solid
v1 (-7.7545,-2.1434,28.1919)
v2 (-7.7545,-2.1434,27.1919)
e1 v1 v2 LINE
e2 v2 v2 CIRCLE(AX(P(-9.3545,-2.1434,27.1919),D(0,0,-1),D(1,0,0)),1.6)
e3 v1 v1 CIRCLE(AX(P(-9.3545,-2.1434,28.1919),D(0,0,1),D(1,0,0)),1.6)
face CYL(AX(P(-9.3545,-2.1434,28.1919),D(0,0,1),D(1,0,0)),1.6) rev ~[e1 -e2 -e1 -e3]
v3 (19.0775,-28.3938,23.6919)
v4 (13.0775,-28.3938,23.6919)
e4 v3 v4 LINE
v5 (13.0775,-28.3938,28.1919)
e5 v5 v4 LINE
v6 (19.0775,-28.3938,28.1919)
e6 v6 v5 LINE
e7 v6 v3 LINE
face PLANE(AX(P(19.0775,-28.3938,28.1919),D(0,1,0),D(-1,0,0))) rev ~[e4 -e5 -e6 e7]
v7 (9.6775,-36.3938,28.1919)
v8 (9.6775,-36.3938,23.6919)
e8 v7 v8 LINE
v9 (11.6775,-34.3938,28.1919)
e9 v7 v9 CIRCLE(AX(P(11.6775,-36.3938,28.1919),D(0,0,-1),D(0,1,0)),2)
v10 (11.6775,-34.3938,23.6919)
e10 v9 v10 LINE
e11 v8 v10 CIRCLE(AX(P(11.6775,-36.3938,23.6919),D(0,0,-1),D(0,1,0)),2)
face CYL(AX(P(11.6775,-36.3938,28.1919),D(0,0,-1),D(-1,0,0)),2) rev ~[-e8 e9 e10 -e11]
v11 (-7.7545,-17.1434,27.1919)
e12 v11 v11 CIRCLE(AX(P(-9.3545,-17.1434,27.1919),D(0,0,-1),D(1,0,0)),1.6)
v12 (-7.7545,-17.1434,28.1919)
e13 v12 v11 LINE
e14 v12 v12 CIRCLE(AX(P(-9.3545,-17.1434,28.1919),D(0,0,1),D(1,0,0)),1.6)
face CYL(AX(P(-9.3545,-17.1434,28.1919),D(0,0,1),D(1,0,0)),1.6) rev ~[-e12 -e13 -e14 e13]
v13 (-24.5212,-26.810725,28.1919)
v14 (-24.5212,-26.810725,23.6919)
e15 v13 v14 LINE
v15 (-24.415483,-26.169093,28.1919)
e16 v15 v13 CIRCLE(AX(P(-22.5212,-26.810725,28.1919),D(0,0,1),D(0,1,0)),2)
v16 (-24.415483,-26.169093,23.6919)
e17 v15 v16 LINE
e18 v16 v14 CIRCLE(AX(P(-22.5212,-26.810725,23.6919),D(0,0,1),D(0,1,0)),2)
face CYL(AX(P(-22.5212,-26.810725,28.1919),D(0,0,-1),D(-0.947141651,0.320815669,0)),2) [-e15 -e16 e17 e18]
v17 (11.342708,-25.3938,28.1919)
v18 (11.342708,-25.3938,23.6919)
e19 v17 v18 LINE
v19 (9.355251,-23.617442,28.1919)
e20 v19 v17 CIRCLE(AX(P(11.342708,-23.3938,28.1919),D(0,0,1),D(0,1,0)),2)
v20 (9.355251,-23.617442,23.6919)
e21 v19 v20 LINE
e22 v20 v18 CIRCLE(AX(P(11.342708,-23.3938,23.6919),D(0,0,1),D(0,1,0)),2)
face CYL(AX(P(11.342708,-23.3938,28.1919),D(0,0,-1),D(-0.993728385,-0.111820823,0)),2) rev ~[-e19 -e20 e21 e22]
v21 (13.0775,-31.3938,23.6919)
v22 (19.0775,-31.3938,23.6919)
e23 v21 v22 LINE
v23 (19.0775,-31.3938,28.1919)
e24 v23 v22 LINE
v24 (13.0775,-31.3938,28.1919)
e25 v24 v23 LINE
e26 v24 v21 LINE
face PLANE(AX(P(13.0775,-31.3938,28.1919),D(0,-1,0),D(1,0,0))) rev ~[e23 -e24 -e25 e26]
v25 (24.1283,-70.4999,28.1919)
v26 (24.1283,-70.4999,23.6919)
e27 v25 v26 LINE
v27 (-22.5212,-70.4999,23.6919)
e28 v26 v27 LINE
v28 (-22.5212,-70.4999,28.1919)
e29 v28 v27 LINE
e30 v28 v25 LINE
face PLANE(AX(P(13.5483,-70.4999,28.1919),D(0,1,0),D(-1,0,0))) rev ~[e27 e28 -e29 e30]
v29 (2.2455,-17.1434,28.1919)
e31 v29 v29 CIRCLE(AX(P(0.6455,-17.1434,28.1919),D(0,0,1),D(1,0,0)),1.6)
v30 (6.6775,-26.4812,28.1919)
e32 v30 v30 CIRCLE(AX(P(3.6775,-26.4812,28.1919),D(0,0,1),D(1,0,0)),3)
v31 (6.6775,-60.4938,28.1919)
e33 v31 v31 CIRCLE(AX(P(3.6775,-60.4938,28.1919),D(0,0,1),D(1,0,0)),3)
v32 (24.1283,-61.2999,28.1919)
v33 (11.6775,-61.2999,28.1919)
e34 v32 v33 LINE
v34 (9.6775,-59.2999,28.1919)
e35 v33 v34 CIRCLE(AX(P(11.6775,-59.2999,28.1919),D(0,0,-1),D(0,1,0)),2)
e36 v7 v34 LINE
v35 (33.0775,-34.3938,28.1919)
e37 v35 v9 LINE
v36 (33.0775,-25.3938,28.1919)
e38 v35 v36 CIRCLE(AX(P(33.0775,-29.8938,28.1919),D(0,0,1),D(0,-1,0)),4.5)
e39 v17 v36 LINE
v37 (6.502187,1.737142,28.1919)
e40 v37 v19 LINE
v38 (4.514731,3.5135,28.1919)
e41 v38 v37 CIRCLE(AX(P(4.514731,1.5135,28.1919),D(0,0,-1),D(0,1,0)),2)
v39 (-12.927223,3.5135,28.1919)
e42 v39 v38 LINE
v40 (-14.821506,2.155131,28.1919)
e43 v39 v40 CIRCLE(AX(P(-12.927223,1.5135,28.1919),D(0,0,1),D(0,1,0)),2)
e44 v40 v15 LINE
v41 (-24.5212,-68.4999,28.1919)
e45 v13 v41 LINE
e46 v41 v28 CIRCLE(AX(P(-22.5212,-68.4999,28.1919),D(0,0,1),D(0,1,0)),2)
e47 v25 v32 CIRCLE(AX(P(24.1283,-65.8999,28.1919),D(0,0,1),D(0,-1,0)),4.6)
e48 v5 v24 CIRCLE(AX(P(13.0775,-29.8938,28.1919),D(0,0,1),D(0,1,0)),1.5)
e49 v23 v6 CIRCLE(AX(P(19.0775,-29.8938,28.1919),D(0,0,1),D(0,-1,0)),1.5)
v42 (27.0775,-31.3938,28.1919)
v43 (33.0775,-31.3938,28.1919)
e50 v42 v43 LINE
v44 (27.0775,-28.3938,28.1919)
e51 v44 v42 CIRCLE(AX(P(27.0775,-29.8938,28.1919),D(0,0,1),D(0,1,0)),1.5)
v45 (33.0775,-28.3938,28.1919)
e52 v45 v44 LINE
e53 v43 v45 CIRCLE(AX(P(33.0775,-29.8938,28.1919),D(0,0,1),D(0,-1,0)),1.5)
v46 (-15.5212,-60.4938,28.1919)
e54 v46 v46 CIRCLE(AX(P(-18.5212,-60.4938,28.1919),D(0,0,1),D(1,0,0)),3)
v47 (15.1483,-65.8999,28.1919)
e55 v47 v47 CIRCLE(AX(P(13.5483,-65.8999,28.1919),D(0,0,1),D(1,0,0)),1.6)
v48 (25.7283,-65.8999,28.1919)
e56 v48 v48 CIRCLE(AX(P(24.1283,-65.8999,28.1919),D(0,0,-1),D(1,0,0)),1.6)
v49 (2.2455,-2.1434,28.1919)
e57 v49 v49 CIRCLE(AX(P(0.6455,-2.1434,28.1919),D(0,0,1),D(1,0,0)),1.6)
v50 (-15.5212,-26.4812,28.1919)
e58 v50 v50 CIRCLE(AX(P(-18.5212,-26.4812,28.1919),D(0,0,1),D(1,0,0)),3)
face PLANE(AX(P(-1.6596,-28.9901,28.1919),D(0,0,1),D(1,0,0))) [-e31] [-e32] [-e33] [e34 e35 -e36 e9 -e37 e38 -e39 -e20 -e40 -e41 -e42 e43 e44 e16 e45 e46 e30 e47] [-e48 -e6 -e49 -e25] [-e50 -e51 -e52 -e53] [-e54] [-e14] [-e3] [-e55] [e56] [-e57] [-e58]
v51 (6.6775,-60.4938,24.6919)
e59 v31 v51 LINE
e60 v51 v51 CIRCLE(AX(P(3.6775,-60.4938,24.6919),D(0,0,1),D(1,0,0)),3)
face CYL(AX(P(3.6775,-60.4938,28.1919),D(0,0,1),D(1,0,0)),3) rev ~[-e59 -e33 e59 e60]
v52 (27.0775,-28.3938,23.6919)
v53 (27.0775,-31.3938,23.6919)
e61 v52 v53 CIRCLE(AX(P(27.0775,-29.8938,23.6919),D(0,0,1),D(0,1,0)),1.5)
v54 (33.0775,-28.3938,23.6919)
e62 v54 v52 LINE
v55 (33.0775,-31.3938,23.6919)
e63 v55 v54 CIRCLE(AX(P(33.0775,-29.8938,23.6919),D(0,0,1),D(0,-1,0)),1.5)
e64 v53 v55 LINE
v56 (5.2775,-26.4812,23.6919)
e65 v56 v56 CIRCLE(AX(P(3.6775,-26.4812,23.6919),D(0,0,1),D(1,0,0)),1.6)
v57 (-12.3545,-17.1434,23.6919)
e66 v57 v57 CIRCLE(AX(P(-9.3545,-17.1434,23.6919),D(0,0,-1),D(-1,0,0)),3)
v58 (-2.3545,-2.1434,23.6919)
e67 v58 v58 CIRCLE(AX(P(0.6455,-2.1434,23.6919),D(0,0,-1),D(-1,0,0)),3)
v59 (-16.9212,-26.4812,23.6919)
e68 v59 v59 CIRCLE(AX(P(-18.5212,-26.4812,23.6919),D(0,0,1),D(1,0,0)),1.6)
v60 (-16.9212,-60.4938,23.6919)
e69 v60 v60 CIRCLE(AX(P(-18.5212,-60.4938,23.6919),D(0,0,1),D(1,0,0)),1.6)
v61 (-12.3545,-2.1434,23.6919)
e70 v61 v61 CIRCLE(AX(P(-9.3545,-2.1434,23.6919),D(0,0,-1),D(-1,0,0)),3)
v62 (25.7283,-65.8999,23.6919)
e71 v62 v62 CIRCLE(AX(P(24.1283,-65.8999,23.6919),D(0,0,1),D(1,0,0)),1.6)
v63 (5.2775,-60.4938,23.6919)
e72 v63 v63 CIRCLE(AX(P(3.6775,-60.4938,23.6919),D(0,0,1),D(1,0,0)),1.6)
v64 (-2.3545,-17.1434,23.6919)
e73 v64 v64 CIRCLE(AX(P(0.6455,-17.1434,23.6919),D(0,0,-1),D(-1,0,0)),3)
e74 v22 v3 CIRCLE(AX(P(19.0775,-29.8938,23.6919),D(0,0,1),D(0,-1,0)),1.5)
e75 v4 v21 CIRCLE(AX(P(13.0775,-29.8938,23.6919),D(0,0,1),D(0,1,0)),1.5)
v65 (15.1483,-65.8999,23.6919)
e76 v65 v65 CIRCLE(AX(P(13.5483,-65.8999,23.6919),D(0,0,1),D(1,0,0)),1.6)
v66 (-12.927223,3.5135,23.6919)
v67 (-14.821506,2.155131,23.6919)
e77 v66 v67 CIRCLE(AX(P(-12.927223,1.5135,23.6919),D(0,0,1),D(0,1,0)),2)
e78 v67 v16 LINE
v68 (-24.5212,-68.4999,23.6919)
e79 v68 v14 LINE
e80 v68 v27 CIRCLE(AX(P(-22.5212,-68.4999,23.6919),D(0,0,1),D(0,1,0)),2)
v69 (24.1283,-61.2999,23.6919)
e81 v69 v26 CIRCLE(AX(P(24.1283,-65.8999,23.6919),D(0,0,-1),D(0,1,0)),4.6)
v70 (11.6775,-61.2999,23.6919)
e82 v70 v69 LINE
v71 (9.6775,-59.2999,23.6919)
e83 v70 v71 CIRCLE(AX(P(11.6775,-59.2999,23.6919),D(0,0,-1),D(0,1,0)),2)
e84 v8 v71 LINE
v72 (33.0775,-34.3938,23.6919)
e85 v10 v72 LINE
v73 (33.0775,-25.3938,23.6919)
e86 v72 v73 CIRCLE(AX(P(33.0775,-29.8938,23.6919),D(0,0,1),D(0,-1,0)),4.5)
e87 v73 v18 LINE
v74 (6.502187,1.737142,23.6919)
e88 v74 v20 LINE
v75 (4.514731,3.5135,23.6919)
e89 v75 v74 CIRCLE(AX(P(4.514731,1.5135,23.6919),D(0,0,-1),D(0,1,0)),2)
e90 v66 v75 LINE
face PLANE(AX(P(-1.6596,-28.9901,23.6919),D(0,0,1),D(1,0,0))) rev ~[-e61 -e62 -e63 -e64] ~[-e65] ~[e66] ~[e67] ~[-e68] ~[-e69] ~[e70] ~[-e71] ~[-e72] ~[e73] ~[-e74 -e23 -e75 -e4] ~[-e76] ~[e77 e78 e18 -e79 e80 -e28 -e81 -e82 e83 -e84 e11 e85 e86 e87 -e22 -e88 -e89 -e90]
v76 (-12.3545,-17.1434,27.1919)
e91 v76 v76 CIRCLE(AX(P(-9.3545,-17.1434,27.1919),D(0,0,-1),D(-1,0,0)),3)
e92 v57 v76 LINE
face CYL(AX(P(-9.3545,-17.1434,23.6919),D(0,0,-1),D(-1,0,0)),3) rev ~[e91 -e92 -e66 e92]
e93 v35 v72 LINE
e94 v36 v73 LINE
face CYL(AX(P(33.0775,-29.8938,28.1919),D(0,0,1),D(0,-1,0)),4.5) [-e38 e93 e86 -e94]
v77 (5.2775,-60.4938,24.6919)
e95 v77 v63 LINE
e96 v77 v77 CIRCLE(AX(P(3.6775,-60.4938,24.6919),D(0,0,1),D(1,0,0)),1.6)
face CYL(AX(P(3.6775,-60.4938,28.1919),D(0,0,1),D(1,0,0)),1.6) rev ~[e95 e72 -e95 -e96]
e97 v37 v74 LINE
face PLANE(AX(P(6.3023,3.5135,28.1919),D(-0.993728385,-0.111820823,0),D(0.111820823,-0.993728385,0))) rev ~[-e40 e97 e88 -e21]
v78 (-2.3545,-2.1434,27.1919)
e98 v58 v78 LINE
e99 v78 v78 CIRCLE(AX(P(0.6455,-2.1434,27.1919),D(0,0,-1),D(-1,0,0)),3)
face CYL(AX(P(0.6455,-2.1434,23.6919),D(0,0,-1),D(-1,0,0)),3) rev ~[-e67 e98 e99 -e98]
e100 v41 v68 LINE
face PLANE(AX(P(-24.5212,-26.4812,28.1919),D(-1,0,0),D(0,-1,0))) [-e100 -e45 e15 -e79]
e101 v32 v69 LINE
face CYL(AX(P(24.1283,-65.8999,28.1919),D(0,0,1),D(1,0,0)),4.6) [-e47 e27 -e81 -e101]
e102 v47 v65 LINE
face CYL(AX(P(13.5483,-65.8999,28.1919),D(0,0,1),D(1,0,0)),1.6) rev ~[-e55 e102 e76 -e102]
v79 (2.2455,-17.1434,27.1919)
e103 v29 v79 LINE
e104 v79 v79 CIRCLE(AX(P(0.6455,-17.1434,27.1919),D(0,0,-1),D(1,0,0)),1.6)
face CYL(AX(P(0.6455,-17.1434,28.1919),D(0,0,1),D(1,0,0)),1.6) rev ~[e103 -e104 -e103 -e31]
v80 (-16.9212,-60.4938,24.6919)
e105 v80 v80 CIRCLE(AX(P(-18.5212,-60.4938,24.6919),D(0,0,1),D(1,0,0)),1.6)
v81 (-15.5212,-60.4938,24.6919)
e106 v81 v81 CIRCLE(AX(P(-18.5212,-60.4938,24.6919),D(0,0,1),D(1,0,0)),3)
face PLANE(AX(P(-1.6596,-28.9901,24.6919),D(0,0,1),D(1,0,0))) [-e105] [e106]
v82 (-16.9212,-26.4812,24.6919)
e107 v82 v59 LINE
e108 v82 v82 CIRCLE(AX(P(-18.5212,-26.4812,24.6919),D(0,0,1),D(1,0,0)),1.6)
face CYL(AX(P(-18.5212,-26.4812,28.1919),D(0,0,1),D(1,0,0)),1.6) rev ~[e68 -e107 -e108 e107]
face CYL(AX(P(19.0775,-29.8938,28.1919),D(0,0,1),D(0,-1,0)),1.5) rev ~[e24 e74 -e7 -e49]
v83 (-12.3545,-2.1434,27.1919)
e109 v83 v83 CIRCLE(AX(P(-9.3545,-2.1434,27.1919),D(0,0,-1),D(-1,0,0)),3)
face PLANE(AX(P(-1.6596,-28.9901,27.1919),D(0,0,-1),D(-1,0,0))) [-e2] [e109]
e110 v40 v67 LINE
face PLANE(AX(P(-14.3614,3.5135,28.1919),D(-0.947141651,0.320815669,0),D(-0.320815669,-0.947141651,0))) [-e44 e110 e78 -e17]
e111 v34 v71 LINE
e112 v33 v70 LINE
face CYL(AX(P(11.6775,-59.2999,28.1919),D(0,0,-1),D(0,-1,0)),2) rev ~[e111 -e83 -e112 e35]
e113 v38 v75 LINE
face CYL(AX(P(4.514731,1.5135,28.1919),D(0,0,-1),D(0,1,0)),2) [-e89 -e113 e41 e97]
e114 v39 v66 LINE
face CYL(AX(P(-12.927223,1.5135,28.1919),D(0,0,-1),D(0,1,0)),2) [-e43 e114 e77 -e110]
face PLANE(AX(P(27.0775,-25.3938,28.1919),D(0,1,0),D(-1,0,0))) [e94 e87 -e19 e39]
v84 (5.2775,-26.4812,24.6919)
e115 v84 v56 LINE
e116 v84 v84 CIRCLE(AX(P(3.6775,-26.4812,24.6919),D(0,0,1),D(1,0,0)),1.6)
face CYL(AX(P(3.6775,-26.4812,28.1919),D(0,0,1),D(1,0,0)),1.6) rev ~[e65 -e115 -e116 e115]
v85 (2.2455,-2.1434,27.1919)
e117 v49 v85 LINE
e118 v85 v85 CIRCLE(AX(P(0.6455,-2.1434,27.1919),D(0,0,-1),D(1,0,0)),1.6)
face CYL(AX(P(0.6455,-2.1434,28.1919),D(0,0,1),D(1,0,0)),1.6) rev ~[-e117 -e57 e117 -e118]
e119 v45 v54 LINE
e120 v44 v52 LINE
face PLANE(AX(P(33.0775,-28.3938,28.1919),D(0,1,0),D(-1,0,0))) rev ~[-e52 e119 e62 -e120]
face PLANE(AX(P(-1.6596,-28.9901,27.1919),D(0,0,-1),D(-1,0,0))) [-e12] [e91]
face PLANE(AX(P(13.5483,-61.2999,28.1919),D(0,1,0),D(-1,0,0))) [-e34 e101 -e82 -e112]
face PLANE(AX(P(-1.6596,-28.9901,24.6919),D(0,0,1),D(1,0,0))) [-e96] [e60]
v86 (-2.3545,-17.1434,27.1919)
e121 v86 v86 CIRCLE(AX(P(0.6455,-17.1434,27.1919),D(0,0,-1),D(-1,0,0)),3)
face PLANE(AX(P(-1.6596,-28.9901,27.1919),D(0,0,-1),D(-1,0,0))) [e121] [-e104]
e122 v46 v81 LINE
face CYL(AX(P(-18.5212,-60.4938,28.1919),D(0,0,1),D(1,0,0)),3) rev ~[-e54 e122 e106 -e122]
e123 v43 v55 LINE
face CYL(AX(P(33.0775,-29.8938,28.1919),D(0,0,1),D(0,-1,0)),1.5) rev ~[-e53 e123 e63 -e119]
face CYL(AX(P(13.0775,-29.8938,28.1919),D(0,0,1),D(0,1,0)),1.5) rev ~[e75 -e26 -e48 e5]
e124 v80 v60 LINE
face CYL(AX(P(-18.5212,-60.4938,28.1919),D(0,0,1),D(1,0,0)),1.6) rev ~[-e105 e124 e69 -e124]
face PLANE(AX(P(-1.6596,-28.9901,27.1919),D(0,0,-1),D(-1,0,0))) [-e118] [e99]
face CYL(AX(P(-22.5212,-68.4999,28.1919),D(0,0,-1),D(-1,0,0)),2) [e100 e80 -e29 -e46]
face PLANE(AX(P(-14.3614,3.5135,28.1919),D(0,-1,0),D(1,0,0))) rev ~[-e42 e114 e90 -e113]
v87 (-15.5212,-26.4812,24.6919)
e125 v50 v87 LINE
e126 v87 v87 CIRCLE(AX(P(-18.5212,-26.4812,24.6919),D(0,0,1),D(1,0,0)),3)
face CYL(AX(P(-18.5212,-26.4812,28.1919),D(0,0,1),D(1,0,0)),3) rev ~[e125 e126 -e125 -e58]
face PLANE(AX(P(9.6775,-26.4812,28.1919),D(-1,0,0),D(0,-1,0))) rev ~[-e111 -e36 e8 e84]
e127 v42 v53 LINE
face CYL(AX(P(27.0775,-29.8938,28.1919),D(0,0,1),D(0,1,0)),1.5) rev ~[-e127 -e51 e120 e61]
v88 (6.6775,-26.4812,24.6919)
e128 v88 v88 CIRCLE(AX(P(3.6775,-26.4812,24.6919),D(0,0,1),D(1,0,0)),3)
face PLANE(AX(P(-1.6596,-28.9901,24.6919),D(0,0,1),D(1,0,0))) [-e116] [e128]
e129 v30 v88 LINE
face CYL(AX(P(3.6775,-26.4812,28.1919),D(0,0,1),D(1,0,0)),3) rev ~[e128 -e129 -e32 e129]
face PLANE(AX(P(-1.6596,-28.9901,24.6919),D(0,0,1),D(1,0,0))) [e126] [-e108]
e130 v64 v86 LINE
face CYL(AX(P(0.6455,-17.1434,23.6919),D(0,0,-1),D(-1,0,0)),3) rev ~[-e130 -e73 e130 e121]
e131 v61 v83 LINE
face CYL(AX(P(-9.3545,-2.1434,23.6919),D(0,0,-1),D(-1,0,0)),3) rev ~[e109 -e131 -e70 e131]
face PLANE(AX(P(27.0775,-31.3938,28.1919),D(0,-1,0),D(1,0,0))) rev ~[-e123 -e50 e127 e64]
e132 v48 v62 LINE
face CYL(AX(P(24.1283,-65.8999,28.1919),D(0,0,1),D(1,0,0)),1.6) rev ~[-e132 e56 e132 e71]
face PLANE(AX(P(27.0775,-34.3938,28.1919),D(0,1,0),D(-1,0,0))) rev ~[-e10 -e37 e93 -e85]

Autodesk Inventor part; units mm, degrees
ref_plane "YZ Plane" through (0, 0, 0) normal (1, 0, 0) x (0, 1, 0)
ref_plane "XZ Plane" through (0, 0, 0) normal (0, 1, 0) x (-1, 0, 0)
ref_plane "XY Plane" through (0, 0, 0) normal (0, 0, 1) x (1, 0, 0)
ref_plane "Work Plane1" through (-1.6596, -28.9901, 28.1919) normal (0, 0, 1) x (1, 0, 0)
sketch "Sketch1" plane through (-1.6596, -28.9901, 28.1919) normal (0, 0, 1) x (1, 0, 0)
  spline S0 degree 3 poles (-18.1261, -96.0287) (-18.1261, -96.0287) (-18.0932, -96.0287) (-18.0298, -96.0287) (-17.8251, -96.0287) (-17.2794, -96.0287) (-16.7467, -96.0287) (-16.213, -96.0287) (-15.7353, -96.0287) (-15.6244, -96.0287) (-15.6063, -96.0287) (-15.5971, -96.0287) (-15.5971, -96.0287) knots 0.499993 0.499993 0.499993 0.499993 0.562494 0.562494 0.562494 0.764477 0.764477 0.764477 0.966846 0.966846 0.966846 1 1 1 1 construction
  line L0 (-18.3185, -96.0287) -> (-15.9665, -96.0287) construction
  arc A0 (-13.8616, 2.5089) -> (-19.8616, 2.5089) centre (-16.8616, 2.5089) ccw construction
  arc A1 (-13.9993, -31.5037) -> (-19.9993, -31.5037) centre (-16.9993, -31.5037) ccw construction
  arc A2 (3.0015, -1.5044) -> (9.0015, -1.5044) centre (6.0015, -1.5044) ccw
  circle A3 centre (-16.8616, -31.5037) radius 1.6
  circle A4 centre (5.3371, -31.5037) radius 1.6
  circle A5 centre (-16.8616, 2.5089) radius 1.6
  circle A6 centre (5.3371, 2.5089) radius 1.6
  line L1 (-19.8616, 2.5089) -> (-22.8616, 2.5089) construction
  line L2 (6.9371, 2.5089) -> (11.3371, 2.5089) construction
  line L3 (-16.8616, -33.1037) -> (-16.8616, -36.2364) construction
  line L4 (-12.7018, 32.5036) -> (-22.8616, 2.5089)
  line L5 (-22.8616, 2.5089) -> (-22.8616, -36.2364)
  line L6 (7.9619, 32.5036) -> (11.3371, 2.5089)
  line L7 (11.3371, 2.5089) -> (11.3371, -36.2364)
  line L8 (11.3371, -36.2364) -> (-22.8616, -36.2364)
  line L9 (2.3051, 26.8467) -> (7.9619, 32.5036) construction
  line L10 (-12.7018, 32.5036) -> (7.9619, 32.5036)
  line L11 (2.3051, 26.8467) -> (-7.6949, 26.8467) construction
  line L12 (-19.8616, 78.2844) -> (-2.5116, 78.2844) construction
  line L13 (-11.1866, 78.2844) -> (-4.9166, 78.2844) construction
  line L14 (-11.1866, 78.2844) -> (-17.4566, 78.2844) construction
  line L15 (-19.8616, 78.2844) -> (-17.4566, 78.2844) construction
  line L16 (-4.9166, 78.2844) -> (-2.5116, 78.2844) construction
  line L17 (-7.6949, 26.8467) -> (-7.6949, 11.8467) construction
  circle A7 centre (-7.6949, 26.8467) radius 1.6
  circle A8 centre (-7.6949, 11.8467) radius 1.6
  line L18 (-7.6949, 11.8467) -> (2.3051, 11.8467) construction
  circle A9 centre (2.3051, 11.8467) radius 1.6
  circle A10 centre (2.3051, 26.8467) radius 1.6
  point P0 (1.6596, 28.9901)
  point P1 (-18.3185, 3.0171)
  point P2 (-15.9662, 3.4042)
  dimension "d5" = 3.2
  dimension "d8" = 3.2
  dimension "d6" = 3.2
  dimension "d7" = 3.2
  dimension "d51" = 3
  dimension "d52" = 4.4
  dimension "d56" = 8
  dimension "d58" = 10
  dimension "d59" = 17.35
  dimension "d60" = 6.27
  dimension "d61" = 6.27
  dimension "d62" = 15
  dimension "d63" = 3.2
  dimension "d64" = 3.2
  dimension "d65" = 3.2
  dimension "d66" = 3.2
ref_plane "Work Plane2" through (-8.6352, -23.8919, -35.0523) normal (0, 0, 1) x (1, 0, 0)
sketch "Sketch2" plane through (-8.6352, -23.8919, -35.0523) normal (0, 0, 1) x (1, 0, 0)
  line L0 (-7.5414, 41.3535) -> (-20.5414, 41.3535) projected
  line L1 (-20.5414, 44.5535) -> (-7.5414, 44.5535) projected
  line L2 (-7.5414, 44.5535) -> (-7.5414, 41.3535) projected
  line L3 (-20.5414, 41.3535) -> (-20.5414, 44.5535) projected
  line L4 (13.5, 41.3535) -> (0.5, 41.3535) projected
  line L5 (0.5, 44.5535) -> (13.5, 44.5535) projected
  line L6 (13.5, 44.5535) -> (13.5, 41.3535) projected
  line L7 (0.5, 41.3535) -> (0.5, 44.5535) projected
  line L8 (34.55, 41.3535) -> (21.55, 41.3535) projected
  line L9 (21.55, 44.5535) -> (34.55, 44.5535) projected
  line L10 (21.55, 41.3535) -> (21.55, 44.5535) projected
  line L11 (34.55, 44.5535) -> (34.55, 41.3535) projected
  line L12 (-14.0414, 44.5535) -> (-14.0414, 41.3535) construction
  line L13 (28.05, 44.5535) -> (28.05, 41.3535) construction
  circle A0 centre (-14.0414, 42.9535) radius 1.6
  circle A1 centre (28.05, 42.9535) radius 1.6
  point P0 (8.6352, 23.8919)
extrude "Extrusion1" add sketch "Sketch1" against normal blind 4.5
sketch "Sketch3" plane through (-1.6596, -28.9901, 28.1919) normal (0, 0, 1) x (1, 0, 0)
  line L0 (19.4071, -58.7998) -> (21.4071, -58.7998) construction
  line L1 (20.4071, -58.7998) -> (20.4979, -36.9098) construction
  line L2 (20.4979, -36.9098) -> (25.7879, -36.9098) construction
  line L3 (25.7879, -36.9098) -> (15.2079, -36.9098) construction
  circle A0 centre (15.2079, -36.9098) radius 1.6
  circle A1 centre (25.7879, -36.9098) radius 1.6
  circle A2 centre (15.2079, -36.9098) radius 4.6
  circle A3 centre (25.7879, -36.9098) radius 4.6
  line L4 (25.7879, -32.3098) -> (9.0007, -32.3098)
  line L5 (9.0007, -34.5533) -> (9.0007, 32.4467) projected
  line L6 (25.7879, -41.5098) -> (15.2079, -41.5098)
  line L7 (15.2079, -41.5098) -> (-19.9993, -41.5098)
  line L8 (-19.9993, -34.5533) -> (-19.9993, 32.4467) projected
  line L9 (-19.9993, -41.5098) -> (-19.9993, -34.5533)
  line L10 (-19.9993, -34.5533) -> (9.0007, -34.5533)
  line L11 (9.0007, -34.5533) -> (9.0007, -32.3098)
  line L12 (25.7879, -36.9098) -> (30.1497, -38.3706)
  line L13 (45.9071, 7.0963) -> (8.7371, 7.0963) construction
  line L14 (8.7371, 7.0963) -> (14.7371, 7.0963) construction
  line L15 (14.7371, 7.0963) -> (14.7371, -0.9037) construction
  line L16 (14.7371, -0.9037) -> (34.7371, -0.9037) construction
  line L17 (14.7371, -0.9037) -> (20.7371, -0.9037) construction
  line L18 (14.7371, -2.4037) -> (20.7371, -2.4037)
  line L19 (20.7371, 0.5963) -> (14.7371, 0.5963)
  arc A4 (14.7371, 0.5963) -> (14.7371, -2.4037) centre (14.7371, -0.9037) ccw
  arc A5 (20.7371, -2.4037) -> (20.7371, 0.5963) centre (20.7371, -0.9037) ccw
  line L20 (34.7371, -0.9037) -> (28.7371, -0.9037) construction
  line L21 (34.7371, 0.5963) -> (28.7371, 0.5963)
  line L22 (28.7371, -2.4037) -> (34.7371, -2.4037)
  arc A6 (34.7371, -2.4037) -> (34.7371, 0.5963) centre (34.7371, -0.9037) ccw
  arc A7 (28.7371, 0.5963) -> (28.7371, -2.4037) centre (28.7371, -0.9037) ccw
  line L23 (34.7371, 3.5963) -> (28.7371, 3.5963)
  arc A8 (28.7371, 3.5963) -> (28.7371, -5.4037) centre (28.7371, -0.9037) ccw
  line L24 (28.7371, -5.4037) -> (34.7371, -5.4037)
  arc A9 (34.7371, -5.4037) -> (34.7371, 3.5963) centre (34.7371, -0.9037) ccw
  line L25 (28.7371, 3.5963) -> (9.0007, 3.5963)
  line L26 (28.7371, -5.4037) -> (9.0007, -5.4037)
  line L27 (11.3371, -36.2364) -> (-22.8616, -36.2364) projected
  line L28 (-22.8616, -36.2364) -> (-22.8616, -41.5098)
  line L29 (-22.8616, -41.5098) -> (-19.9993, -41.5098)
  point P0 (1.6596, 28.9901)
  point P1 (11.4479, -23.0098)
  point P2 (9.0007, -15.5098)
  point P3 (17.7371, -0.9037)
  point P4 (31.7371, -0.9037)
  point P5 (-19.9993, -36.2364)
  dimension "d9" = 10.58
  dimension "d10" = 5.29
  dimension "d11" = 10.58
  dimension "d12" = 3.2
  dimension "d13" = 3.2
  dimension "d14" = 3
  dimension "d15" = 3
  dimension "d43" = 6
  dimension "d44" = 8
  dimension "d45" = 20
  dimension "d46" = 6
  dimension "d47" = 3
  dimension "d48" = 6
  dimension "d49" = 3
  dimension "d50" = 3
extrude "Extrusion2" add sketch "Sketch3" against normal blind 4.5
sketch "Sketch4" plane through (-1.6596, -28.9901, 23.6919) normal (0, 0, -1) x (-1, 0, 0)
  circle A0 centre (-2.3051, 26.8467) radius 1.6 projected
  circle A1 centre (-2.3051, 26.8467) radius 3
  circle A2 centre (7.6949, 26.8467) radius 1.6 projected
  circle A3 centre (7.6949, 26.8467) radius 3
  circle A4 centre (7.6949, 11.8467) radius 1.6 projected
  circle A5 centre (7.6949, 11.8467) radius 3
  circle A6 centre (-2.3051, 11.8467) radius 1.6 projected
  circle A7 centre (-2.3051, 11.8467) radius 3
  dimension "d67" = 6
  dimension "d68" = 6
  dimension "d69" = 6
  dimension "d70" = 6
extrude "Extrusion3" cut sketch "Sketch4" against normal blind 3.5
fillet "Fillet1" radius 2 7 edges at (-24.5212, -70.4999, 25.9419) (9.6775, -34.3938, 25.9419) (9.6775, -61.2999, 25.9419) (9.5552, -25.3938, 25.9419) (-14.3614, 3.5135, 25.9419) (6.3023, 3.5135, 25.9419) (-24.5212, -26.4812, 25.9419)
sketch "Sketch5" plane through (-1.6596, -28.9901, 28.1919) normal (0, 0, 1) x (1, 0, 0)
  circle A0 centre (-16.8616, 2.5089) radius 1.6 projected
  circle A1 centre (-16.8616, 2.5089) radius 3
  circle A2 centre (5.3371, 2.5089) radius 1.6 projected
  circle A3 centre (5.3371, 2.5089) radius 3
  circle A4 centre (-16.8616, -31.5037) radius 1.6 projected
  circle A5 centre (-16.8616, -31.5037) radius 3
  circle A6 centre (5.3371, -31.5037) radius 1.6 projected
  circle A7 centre (5.3371, -31.5037) radius 3
  point P0 (1.6596, 28.9901)
  dimension "d25" = 6
  dimension "d26" = 6
  dimension "d27" = 6
  dimension "d28" = 6
extrude "Extrusion4" cut sketch "Sketch5" against normal blind 3.5 contours A1 | A2 | A3 | A5 | A7
properties part number "rails-bolts"
